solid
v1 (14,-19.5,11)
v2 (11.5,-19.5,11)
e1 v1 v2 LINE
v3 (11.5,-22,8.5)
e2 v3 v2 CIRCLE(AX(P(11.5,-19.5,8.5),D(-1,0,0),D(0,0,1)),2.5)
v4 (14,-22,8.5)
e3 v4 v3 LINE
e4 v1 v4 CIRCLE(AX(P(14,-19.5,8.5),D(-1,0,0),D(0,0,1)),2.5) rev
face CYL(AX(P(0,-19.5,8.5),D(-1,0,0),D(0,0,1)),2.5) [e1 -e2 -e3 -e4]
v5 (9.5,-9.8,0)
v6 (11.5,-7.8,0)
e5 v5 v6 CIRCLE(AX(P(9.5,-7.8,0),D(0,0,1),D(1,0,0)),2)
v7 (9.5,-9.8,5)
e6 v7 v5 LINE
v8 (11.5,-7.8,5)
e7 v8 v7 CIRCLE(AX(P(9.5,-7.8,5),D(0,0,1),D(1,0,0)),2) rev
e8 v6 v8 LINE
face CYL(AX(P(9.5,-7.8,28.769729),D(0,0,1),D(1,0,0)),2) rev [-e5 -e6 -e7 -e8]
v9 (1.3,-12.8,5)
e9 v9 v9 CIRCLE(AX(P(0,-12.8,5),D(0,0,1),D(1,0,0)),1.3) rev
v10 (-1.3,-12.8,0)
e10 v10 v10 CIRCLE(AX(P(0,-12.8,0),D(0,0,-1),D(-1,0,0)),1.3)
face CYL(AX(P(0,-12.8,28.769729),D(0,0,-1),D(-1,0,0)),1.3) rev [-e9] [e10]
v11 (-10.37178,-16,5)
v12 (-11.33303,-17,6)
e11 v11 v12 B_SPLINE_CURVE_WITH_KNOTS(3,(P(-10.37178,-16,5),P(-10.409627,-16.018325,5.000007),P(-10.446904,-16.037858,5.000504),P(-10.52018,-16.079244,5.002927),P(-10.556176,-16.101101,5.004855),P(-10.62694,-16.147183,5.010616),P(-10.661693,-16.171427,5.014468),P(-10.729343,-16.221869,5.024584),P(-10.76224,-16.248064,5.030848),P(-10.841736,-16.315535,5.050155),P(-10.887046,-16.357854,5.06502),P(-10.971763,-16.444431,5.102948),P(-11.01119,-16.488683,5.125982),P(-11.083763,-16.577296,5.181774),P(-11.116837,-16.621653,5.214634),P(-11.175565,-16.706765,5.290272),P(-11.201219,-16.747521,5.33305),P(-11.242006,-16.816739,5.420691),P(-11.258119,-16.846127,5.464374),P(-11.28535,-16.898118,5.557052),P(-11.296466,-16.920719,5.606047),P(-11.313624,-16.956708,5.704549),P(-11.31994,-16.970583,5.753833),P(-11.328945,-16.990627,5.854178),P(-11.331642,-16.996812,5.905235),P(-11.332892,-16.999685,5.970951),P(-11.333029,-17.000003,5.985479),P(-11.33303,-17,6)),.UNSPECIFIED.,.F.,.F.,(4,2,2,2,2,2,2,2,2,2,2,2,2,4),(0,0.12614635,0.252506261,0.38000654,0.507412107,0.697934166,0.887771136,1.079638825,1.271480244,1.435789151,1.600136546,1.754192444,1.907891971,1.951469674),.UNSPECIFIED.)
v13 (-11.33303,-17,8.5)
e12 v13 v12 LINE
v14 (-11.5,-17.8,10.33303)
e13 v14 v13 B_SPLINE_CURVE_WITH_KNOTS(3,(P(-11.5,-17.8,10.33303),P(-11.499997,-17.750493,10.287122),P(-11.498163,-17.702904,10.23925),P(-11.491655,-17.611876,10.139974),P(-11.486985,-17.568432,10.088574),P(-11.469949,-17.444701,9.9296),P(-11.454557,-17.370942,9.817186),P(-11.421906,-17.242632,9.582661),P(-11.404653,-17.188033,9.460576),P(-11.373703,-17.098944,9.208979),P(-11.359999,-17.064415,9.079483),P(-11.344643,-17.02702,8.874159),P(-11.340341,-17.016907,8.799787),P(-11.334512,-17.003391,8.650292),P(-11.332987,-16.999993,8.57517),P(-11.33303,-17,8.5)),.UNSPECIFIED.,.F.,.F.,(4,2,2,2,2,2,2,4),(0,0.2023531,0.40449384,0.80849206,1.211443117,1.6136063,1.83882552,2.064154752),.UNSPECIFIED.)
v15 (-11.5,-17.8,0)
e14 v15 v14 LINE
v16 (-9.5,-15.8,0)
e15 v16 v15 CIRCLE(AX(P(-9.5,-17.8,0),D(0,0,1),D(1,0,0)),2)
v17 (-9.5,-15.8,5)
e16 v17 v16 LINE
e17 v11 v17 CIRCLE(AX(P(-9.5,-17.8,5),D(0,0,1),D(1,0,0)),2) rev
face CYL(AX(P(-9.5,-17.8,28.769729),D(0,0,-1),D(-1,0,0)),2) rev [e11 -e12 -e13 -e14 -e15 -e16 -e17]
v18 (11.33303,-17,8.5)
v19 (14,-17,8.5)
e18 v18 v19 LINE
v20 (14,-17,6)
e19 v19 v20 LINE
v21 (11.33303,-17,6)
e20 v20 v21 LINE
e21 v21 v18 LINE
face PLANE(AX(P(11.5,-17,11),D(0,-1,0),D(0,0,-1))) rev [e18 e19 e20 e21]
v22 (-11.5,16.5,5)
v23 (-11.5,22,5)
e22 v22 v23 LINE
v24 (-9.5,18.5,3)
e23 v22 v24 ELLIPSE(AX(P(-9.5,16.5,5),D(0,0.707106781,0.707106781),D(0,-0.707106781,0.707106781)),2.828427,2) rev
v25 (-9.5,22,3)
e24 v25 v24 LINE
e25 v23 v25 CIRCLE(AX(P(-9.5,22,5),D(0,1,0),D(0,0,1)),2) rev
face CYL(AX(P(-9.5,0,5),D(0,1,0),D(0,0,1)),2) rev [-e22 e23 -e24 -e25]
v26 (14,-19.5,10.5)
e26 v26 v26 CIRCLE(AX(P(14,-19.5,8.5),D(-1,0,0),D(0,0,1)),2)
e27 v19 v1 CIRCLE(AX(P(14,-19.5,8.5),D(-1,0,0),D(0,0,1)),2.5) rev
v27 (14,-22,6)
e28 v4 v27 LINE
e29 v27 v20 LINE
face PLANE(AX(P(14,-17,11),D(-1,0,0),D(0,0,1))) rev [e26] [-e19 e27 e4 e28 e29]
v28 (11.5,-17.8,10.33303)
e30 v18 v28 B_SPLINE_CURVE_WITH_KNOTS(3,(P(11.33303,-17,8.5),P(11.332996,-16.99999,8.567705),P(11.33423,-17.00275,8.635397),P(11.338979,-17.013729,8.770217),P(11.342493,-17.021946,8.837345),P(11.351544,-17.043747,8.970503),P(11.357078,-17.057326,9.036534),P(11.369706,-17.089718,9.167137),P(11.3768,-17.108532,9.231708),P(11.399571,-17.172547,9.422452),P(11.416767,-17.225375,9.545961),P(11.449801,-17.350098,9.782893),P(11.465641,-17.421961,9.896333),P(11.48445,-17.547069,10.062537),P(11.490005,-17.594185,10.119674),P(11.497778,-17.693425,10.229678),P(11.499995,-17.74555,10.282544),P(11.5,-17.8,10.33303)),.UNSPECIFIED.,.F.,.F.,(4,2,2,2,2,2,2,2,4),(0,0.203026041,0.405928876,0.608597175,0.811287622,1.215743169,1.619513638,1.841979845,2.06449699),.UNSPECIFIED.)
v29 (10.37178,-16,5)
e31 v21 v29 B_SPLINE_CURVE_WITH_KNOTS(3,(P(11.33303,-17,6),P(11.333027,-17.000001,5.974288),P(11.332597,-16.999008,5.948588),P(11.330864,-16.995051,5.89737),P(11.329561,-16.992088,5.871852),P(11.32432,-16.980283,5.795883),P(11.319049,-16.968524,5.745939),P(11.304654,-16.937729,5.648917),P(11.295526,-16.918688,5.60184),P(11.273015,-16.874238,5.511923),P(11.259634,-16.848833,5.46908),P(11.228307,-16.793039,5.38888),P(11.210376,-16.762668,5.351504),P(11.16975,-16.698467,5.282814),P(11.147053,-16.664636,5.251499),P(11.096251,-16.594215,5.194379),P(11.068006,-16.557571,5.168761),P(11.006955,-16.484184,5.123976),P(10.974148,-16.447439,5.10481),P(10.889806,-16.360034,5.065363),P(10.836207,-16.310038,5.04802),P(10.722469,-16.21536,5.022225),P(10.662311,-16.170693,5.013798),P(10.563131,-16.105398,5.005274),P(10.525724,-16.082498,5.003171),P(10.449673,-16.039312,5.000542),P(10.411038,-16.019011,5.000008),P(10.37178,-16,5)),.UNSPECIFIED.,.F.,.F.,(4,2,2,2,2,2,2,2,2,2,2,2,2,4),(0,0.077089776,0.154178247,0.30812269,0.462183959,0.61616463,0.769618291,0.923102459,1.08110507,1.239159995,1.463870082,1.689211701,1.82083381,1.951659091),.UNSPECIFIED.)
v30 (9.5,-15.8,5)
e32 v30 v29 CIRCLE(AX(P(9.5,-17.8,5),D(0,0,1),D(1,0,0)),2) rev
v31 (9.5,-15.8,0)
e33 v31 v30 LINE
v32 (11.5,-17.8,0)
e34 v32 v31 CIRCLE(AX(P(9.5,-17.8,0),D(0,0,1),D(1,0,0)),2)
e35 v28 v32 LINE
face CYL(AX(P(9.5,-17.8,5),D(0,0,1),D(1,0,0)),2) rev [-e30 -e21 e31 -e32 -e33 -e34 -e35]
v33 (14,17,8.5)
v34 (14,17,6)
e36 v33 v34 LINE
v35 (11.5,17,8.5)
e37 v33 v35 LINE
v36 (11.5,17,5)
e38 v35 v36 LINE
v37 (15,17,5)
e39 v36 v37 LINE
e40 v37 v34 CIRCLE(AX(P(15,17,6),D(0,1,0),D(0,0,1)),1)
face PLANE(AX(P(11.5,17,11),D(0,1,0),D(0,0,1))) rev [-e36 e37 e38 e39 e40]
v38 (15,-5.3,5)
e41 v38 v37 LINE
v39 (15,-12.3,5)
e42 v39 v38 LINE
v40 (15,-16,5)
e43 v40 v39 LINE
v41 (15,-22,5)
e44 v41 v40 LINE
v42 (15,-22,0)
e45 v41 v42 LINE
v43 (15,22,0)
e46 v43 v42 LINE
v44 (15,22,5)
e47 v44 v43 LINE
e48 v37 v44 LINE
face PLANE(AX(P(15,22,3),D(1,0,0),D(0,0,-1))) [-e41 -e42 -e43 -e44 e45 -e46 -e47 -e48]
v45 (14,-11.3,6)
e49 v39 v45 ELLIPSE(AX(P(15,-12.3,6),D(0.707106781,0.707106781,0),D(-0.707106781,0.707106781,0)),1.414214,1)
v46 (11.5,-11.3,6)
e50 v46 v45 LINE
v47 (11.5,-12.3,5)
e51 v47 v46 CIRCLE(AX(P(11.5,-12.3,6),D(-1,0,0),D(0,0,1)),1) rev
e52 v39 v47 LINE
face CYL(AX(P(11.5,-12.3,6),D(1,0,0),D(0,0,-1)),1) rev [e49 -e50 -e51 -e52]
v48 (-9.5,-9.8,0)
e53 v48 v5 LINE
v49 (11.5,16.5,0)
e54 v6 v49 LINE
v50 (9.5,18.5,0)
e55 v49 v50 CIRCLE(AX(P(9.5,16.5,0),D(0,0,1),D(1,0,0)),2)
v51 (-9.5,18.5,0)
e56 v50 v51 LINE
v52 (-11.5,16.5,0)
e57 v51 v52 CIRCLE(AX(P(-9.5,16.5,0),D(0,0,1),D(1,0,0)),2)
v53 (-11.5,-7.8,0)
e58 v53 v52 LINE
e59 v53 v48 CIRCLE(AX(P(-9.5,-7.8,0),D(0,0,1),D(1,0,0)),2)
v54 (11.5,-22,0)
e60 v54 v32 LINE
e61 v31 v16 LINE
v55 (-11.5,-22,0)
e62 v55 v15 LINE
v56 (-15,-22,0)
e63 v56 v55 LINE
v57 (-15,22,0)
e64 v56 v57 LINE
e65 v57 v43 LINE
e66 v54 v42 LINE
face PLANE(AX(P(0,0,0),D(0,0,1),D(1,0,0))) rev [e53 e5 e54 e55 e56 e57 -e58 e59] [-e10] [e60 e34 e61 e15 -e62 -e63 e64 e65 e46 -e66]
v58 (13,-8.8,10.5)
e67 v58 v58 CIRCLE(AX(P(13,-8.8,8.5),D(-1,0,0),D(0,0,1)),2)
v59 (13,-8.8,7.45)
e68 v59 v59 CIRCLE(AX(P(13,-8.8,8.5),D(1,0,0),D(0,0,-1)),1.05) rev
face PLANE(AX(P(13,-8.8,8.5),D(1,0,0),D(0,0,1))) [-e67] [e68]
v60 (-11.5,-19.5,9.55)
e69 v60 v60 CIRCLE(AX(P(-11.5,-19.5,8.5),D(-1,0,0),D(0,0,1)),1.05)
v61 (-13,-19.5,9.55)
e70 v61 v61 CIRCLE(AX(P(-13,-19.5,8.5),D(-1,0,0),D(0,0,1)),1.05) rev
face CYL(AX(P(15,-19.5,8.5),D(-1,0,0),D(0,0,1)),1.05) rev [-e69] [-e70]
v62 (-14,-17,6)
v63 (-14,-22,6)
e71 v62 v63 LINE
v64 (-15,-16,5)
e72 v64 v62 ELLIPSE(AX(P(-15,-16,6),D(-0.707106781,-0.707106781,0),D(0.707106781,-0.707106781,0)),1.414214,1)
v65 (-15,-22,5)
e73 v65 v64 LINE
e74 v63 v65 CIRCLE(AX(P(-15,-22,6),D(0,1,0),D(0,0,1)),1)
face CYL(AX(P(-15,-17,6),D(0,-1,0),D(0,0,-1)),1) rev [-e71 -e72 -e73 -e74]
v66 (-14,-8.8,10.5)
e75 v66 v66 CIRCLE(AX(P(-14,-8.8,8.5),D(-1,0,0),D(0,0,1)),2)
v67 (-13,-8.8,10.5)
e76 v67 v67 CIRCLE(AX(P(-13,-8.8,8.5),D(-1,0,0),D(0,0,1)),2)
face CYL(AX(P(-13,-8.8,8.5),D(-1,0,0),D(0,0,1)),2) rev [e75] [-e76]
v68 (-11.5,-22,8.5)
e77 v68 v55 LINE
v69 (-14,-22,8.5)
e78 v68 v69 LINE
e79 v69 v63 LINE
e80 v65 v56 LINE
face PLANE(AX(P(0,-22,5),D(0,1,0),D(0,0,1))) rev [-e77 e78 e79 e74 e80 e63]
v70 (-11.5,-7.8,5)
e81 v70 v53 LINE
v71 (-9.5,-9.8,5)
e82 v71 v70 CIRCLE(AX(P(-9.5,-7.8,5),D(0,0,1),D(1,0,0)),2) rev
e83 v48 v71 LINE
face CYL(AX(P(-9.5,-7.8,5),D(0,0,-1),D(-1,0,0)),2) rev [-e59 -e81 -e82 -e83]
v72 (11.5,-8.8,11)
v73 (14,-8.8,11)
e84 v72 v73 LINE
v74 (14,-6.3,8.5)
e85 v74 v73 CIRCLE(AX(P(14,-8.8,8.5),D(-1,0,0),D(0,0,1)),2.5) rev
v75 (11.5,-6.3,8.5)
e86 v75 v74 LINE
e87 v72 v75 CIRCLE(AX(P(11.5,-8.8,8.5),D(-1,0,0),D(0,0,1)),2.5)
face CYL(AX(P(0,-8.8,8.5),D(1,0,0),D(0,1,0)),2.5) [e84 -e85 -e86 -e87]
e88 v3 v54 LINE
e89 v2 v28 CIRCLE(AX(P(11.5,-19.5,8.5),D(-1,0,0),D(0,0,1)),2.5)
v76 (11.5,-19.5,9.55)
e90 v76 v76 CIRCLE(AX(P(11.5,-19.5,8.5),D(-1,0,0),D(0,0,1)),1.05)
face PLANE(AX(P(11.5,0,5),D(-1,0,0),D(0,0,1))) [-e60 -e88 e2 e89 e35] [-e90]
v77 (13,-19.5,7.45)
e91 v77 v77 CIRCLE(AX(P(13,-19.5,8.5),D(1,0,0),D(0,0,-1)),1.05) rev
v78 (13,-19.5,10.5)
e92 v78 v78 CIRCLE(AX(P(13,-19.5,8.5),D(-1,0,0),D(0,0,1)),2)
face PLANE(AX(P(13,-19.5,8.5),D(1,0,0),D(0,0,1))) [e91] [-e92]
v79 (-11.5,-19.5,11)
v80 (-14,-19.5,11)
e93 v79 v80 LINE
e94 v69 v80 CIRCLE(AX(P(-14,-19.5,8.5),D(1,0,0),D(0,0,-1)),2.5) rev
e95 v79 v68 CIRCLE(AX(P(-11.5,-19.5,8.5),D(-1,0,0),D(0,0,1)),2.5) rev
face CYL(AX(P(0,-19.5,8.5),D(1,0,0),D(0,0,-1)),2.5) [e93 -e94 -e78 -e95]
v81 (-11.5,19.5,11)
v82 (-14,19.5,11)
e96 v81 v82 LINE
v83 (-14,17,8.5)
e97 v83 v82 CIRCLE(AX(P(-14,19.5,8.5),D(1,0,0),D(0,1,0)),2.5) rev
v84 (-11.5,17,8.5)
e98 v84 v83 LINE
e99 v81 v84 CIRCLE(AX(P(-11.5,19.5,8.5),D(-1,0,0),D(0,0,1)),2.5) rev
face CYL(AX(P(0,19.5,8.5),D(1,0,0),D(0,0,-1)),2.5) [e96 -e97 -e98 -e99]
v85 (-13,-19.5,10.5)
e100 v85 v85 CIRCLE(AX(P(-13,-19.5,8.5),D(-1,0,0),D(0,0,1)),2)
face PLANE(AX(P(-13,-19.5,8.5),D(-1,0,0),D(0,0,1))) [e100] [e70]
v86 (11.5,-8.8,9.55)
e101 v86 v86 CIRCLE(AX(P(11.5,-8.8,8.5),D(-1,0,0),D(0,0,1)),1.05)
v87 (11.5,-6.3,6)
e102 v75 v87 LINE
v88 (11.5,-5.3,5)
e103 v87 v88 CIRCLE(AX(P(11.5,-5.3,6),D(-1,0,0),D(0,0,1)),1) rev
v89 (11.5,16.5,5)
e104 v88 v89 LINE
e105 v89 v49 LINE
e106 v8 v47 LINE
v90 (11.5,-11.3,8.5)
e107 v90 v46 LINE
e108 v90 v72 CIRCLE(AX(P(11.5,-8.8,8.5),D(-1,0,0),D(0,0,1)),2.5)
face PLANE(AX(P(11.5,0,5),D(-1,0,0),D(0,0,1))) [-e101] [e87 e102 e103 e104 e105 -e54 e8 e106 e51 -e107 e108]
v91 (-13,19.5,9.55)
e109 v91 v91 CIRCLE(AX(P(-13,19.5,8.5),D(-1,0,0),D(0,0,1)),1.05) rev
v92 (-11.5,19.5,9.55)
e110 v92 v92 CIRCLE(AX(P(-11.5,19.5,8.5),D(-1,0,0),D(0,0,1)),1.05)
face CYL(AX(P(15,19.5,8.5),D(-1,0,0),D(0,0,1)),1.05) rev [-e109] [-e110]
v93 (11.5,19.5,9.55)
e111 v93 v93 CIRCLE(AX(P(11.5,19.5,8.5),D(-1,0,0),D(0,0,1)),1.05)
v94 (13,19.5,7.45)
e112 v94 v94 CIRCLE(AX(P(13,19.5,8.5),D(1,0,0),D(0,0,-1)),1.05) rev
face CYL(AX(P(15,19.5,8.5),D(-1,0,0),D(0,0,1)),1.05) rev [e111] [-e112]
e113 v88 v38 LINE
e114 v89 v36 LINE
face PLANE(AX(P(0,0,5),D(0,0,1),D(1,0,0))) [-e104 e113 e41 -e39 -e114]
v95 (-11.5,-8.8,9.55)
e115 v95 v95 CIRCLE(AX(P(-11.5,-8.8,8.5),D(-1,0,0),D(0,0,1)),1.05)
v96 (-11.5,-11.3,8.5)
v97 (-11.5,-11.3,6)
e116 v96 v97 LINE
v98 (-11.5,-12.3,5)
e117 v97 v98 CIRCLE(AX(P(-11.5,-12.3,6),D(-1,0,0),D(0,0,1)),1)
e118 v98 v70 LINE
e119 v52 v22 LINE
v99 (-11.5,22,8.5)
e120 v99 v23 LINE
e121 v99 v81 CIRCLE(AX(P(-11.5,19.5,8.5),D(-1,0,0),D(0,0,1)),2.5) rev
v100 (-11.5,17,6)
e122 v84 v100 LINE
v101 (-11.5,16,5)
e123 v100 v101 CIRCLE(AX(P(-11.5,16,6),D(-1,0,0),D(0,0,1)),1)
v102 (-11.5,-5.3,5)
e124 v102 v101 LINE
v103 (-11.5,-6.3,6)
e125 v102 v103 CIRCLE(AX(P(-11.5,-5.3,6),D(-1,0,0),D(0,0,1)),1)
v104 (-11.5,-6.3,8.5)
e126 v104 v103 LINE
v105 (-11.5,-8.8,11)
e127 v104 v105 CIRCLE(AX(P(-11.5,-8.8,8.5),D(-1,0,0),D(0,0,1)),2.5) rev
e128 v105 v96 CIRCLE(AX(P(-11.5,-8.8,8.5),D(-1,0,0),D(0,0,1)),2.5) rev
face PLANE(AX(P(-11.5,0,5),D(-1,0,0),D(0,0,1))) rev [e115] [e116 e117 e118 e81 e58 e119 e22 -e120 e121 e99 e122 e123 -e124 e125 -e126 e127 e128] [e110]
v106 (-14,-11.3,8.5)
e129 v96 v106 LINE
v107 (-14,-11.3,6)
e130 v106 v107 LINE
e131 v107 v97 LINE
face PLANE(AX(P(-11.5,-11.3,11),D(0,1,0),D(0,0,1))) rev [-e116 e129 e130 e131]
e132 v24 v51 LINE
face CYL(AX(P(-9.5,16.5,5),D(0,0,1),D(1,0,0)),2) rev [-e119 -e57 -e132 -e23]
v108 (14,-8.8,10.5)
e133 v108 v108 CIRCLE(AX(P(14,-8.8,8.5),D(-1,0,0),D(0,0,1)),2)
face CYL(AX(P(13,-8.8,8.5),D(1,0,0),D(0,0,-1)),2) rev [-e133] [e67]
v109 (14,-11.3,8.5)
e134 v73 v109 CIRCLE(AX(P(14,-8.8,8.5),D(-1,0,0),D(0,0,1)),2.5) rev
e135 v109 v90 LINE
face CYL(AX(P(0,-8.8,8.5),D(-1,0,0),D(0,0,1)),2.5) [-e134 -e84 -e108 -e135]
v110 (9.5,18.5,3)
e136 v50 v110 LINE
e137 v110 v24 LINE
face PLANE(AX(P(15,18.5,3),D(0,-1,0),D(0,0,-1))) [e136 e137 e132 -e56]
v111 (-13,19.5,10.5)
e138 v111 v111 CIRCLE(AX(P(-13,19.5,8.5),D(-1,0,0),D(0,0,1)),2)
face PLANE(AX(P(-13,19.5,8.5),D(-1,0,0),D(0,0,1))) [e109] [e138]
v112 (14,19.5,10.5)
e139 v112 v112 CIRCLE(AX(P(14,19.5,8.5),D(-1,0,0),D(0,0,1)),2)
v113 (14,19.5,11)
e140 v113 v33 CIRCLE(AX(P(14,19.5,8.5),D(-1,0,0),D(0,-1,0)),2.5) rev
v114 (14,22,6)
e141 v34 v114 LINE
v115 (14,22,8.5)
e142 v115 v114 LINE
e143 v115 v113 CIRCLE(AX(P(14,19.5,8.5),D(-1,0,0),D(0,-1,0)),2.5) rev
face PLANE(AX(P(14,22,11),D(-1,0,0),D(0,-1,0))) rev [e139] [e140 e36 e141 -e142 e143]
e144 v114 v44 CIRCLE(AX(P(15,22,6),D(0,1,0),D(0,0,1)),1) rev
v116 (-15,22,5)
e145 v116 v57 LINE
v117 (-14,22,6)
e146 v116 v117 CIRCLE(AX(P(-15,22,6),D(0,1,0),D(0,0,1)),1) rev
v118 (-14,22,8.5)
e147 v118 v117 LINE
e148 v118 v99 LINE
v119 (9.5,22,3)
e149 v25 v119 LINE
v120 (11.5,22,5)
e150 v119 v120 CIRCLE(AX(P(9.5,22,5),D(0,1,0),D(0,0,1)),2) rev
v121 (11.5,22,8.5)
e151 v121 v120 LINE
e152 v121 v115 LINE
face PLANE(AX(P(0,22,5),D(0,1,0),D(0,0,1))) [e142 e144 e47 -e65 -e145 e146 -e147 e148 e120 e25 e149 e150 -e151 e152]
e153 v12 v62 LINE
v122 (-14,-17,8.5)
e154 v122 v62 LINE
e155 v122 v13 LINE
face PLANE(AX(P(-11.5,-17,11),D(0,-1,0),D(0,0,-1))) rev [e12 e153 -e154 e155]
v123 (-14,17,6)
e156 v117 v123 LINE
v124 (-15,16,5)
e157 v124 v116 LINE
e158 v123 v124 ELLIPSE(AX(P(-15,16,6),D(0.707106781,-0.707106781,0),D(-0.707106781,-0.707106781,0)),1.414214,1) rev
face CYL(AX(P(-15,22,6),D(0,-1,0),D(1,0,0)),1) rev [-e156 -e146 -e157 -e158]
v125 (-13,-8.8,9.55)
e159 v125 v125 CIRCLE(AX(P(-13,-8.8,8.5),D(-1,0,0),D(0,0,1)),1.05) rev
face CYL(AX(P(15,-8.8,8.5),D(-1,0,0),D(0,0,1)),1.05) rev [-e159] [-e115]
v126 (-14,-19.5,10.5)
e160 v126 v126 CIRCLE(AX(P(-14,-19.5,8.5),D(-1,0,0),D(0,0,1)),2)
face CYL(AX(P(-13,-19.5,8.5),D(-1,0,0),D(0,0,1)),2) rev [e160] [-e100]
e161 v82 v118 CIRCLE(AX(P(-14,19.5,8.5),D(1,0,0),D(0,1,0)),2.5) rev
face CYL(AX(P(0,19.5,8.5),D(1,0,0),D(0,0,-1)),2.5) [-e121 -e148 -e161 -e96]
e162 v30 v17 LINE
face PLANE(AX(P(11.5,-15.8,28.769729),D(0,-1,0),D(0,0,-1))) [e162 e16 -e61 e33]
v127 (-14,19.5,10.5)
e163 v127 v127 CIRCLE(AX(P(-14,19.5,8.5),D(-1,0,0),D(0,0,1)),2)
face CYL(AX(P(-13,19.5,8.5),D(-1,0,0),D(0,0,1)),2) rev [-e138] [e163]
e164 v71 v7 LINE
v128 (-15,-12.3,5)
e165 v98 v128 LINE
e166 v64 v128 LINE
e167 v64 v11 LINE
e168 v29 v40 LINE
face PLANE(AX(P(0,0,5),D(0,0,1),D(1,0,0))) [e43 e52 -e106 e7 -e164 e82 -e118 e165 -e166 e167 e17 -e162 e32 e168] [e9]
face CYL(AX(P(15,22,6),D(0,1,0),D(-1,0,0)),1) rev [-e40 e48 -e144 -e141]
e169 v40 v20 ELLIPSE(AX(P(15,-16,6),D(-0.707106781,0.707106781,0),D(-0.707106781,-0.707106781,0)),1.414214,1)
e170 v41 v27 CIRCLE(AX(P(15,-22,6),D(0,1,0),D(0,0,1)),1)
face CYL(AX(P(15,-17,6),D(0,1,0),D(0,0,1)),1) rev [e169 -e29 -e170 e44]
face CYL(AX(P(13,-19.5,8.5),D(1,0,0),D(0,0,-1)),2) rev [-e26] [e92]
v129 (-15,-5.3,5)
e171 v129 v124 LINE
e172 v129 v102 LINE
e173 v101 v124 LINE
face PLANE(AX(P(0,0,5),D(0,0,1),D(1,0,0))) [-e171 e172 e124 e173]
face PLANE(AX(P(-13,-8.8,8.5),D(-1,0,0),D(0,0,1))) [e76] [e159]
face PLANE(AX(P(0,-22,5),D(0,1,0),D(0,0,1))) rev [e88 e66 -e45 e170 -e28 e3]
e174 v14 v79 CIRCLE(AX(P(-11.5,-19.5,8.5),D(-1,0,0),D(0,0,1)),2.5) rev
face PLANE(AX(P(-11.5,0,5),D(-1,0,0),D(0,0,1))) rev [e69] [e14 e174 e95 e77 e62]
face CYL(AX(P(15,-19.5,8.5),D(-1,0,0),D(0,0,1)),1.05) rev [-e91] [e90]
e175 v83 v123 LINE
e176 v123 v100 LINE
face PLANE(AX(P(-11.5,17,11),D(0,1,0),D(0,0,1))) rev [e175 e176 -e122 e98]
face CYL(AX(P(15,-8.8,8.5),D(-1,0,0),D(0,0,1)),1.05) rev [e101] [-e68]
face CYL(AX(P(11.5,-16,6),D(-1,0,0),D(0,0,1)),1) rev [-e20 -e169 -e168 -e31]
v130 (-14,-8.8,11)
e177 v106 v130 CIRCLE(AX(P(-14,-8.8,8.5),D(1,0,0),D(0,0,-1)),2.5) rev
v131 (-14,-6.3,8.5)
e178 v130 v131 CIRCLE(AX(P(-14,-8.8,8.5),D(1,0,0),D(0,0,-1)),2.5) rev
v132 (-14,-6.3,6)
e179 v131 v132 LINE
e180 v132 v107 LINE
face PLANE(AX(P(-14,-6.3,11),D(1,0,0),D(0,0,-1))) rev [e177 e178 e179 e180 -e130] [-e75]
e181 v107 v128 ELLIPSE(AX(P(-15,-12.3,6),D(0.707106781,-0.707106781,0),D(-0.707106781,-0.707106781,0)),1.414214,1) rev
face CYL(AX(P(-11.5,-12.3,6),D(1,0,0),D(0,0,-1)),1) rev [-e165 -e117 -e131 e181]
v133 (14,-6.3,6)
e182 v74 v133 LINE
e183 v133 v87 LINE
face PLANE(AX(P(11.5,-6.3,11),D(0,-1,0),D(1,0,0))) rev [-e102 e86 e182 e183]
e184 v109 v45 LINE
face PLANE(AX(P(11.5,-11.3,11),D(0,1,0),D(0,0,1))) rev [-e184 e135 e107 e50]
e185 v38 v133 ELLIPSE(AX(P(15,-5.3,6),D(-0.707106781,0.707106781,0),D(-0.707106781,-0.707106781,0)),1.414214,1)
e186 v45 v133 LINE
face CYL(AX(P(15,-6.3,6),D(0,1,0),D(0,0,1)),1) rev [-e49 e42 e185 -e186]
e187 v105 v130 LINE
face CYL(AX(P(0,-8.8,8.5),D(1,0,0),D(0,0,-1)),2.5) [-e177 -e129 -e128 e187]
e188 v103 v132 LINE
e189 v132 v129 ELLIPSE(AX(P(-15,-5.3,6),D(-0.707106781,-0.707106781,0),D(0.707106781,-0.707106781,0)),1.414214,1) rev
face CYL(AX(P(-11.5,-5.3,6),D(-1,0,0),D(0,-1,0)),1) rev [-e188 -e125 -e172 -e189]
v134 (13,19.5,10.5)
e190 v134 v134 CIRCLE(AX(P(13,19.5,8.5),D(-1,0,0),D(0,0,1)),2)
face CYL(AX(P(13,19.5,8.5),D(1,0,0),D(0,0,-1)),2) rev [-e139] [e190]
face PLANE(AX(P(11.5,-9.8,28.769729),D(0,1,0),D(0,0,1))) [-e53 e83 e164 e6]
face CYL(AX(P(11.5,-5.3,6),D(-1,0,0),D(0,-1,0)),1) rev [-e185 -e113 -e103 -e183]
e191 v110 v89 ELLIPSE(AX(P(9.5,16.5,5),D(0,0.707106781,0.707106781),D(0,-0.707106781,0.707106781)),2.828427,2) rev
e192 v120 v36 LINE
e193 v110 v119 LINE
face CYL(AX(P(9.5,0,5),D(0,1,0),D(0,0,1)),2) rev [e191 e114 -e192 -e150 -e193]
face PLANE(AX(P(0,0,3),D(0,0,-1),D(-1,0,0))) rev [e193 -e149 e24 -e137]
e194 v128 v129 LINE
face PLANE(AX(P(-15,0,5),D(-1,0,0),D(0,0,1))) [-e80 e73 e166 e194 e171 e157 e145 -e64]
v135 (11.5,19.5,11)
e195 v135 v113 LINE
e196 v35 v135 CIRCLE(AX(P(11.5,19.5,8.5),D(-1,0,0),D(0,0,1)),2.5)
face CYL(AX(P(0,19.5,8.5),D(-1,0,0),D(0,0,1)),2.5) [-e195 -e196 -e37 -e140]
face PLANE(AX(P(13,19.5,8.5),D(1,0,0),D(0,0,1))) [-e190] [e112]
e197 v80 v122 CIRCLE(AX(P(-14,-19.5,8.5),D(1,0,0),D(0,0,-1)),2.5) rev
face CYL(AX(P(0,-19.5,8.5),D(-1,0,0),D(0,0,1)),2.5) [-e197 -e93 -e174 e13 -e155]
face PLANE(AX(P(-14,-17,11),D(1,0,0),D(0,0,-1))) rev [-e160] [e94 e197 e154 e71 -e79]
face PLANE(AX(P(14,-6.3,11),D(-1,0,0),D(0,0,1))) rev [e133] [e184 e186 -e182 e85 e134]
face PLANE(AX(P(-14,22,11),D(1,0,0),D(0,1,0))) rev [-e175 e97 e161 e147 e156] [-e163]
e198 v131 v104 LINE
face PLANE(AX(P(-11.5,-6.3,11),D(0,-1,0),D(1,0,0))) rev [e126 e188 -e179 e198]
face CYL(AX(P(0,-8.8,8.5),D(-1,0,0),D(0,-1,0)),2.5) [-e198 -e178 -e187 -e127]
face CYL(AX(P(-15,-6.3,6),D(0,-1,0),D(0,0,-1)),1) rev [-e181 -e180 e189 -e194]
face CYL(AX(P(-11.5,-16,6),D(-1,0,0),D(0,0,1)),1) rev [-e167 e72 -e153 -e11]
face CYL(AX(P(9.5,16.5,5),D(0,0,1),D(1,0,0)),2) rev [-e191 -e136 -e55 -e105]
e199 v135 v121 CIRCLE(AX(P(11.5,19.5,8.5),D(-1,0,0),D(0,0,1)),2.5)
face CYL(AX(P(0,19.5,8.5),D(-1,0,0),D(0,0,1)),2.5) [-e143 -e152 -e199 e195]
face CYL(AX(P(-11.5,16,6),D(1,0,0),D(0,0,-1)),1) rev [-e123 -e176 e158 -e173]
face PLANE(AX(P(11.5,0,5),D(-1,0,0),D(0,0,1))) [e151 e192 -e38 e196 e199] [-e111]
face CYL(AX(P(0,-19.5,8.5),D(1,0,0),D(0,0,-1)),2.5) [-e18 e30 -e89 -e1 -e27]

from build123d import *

# Parameters (mm, degrees)
SKETCH2_W             = 3.5
SKETCH2_H             = 44
BOSS_EXTRUDE1_DEPTH   = 5
BOSS_EXTRUDE1_2_DEPTH = 5
SKETCH3_W             = 30
SKETCH3_H             = 3.5
BOSS_EXTRUDE2_DEPTH   = 3
SKETCH4_W             = 2.5
SKETCH4_H             = 5
BOSS_EXTRUDE3_DEPTH   = 6
SKETCH5_R             = 1.05
CUT_EXTRUDE1_DEPTH    = 39.026306684
FILLET1_R             = 2.5
FILLET2_R             = 2
SKETCH6_W             = 23
SKETCH6_H             = 6
SKETCH6_R             = 1.3
BOSS_EXTRUDE4_DEPTH   = 5
FILLET3_R             = 2
SKETCH7_R             = 2
CUT_EXTRUDE2_DEPTH    = 1
FILLET4_R             = 1


with BuildPart() as part:
    # Sketch2 → Boss-Extrude1 (new body)
    with BuildSketch(Plane.XY):
        with Locations((-13.25, 0)):
            Rectangle(SKETCH2_W, SKETCH2_H)
    extrude(amount=BOSS_EXTRUDE1_DEPTH)



with BuildPart() as body_2:
    # Sketch2 → Boss-Extrude1 2 (new body)
    with BuildSketch(Plane.XY):
        with Locations((13.25, 0)):
            Rectangle(SKETCH2_W, SKETCH2_H)
    extrude(amount=BOSS_EXTRUDE1_2_DEPTH)


with BuildPart() as part_1:
    add(part.part)

    add(body_2.part)  # Boss-Extrude2 merges body 2
    # Sketch3 → Boss-Extrude2 (add)
    with BuildSketch(Plane(origin=(0, 0, 0), x_dir=(-1, 0, 0), z_dir=(0, 0, -1))):
        with Locations((0, 20.25)):
            Rectangle(SKETCH3_W, SKETCH3_H)
    extrude(amount=-BOSS_EXTRUDE2_DEPTH)

    # Sketch4 → Boss-Extrude3 (add)
    with BuildSketch(Plane.XY.offset(5)):
        with Locations((-12.75, 19.5)):
            Rectangle(SKETCH4_W, SKETCH4_H)
        with Locations((-12.75, -8.8)):
            Rectangle(SKETCH4_W, SKETCH4_H)
        with Locations((-12.75, -19.5)):
            Rectangle(SKETCH4_W, SKETCH4_H)
        with Locations((12.75, -19.5)):
            Rectangle(SKETCH4_W, SKETCH4_H)
        with Locations((12.75, -8.8)):
            Rectangle(SKETCH4_W, SKETCH4_H)
        with Locations((12.75, 19.5)):
            Rectangle(SKETCH4_W, SKETCH4_H)
    extrude(amount=BOSS_EXTRUDE3_DEPTH)

    # Sketch5 → Cut-Extrude1 (cut, through all)
    with BuildSketch(Plane.ZY.offset(14)):
        with Locations((8.5, 19.5)):
            Circle(SKETCH5_R)
        with Locations((8.5, -8.8)):
            Circle(SKETCH5_R)
        with Locations((8.5, -19.5)):
            Circle(SKETCH5_R)
    extrude(amount=-CUT_EXTRUDE1_DEPTH, mode=Mode.SUBTRACT)

    # Fillet1
    fillet1_edges = [part_1.edges().sort_by_distance(p)[0] for p in [
        (12.75, -17, 11),
        (12.75, -22, 11),
        (12.75, -6.3, 11),
        (12.75, -11.3, 11),
        (-12.75, -22, 11),
        (-12.75, -17, 11),
        (-12.75, -11.3, 11),
        (-12.75, -6.3, 11),
        (-12.75, 17, 11),
        (-12.75, 22, 11),
        (12.75, 22, 11),
        (12.75, 17, 11),
    ]]
    fillet(fillet1_edges, radius=FILLET1_R - 0.0001)  # a hair under: the kernel refuses the full size

    # Fillet2
    fillet2_edges = [part_1.edges().sort_by_distance(p)[0] for p in [
        (-11.5, 20.25, 3),
        (-11.5, 18.5, 1.5),
        (11.5, 18.5, 1.5),
        (11.5, 20.25, 3),
    ]]
    fillet(fillet2_edges, radius=FILLET2_R - 0.0001)  # a hair under: the kernel refuses the full size

    # Sketch6 → Boss-Extrude4 (add)
    with BuildSketch(Plane(origin=(0, 0, 0), x_dir=(-1, 0, 0), z_dir=(0, 0, -1))):
        with Locations((0, -12.8)):
            Rectangle(SKETCH6_W, SKETCH6_H)
        with Locations((0, -12.8)):
            Circle(SKETCH6_R, mode=Mode.SUBTRACT)
    extrude(amount=-BOSS_EXTRUDE4_DEPTH)

    # Fillet3
    fillet3_edges = [part_1.edges().sort_by_distance(p)[0] for p in [
        (-11.5, -9.8, 2.5),
        (-11.5, -15.8, 2.5),
        (11.5, -15.8, 2.5),
        (11.5, -9.8, 2.5),
    ]]
    fillet(fillet3_edges, radius=FILLET3_R)

    # Sketch7 → Cut-Extrude2 (cut)
    with BuildSketch(Plane.ZY.offset(14)):
        with Locations((8.5, 19.5)):
            Circle(SKETCH7_R)
        with Locations((8.5, -8.8)):
            Circle(SKETCH7_R)
        with Locations((8.5, -19.5)):
            Circle(SKETCH7_R)
    cut_extrude2 = extrude(amount=-CUT_EXTRUDE2_DEPTH, mode=Mode.SUBTRACT)

    # Mirror1: Cut-Extrude2 across plane
    add(cut_extrude2.mirror(Plane(origin=(0, 0, 0), x_dir=(0, 0, 1), z_dir=(1, 0, 0))), mode=Mode.SUBTRACT)

    # Fillet4
    fillet4_edges = [part_1.edges().sort_by_distance(p)[0] for p in [
        (12.75, -11.3, 5),
        (-12.75, -11.3, 5),
        (-12.75, 17, 5),
        (14, -19.5, 5),
        (14, -8.8, 5),
        (14, 19.5, 5),
        (-12.75, -6.3, 5),
        (-12.666515139, -17, 5),
        (-14, -19.5, 5),
        (-14, -8.8, 5),
        (12.666515139, -17, 5),
        (12.75, -6.3, 5),
        (-14, 19.5, 5),
    ]]
    fillet(fillet4_edges, radius=FILLET4_R - 0.0001)  # a hair under: the kernel refuses the full size


solid = part_1.part
